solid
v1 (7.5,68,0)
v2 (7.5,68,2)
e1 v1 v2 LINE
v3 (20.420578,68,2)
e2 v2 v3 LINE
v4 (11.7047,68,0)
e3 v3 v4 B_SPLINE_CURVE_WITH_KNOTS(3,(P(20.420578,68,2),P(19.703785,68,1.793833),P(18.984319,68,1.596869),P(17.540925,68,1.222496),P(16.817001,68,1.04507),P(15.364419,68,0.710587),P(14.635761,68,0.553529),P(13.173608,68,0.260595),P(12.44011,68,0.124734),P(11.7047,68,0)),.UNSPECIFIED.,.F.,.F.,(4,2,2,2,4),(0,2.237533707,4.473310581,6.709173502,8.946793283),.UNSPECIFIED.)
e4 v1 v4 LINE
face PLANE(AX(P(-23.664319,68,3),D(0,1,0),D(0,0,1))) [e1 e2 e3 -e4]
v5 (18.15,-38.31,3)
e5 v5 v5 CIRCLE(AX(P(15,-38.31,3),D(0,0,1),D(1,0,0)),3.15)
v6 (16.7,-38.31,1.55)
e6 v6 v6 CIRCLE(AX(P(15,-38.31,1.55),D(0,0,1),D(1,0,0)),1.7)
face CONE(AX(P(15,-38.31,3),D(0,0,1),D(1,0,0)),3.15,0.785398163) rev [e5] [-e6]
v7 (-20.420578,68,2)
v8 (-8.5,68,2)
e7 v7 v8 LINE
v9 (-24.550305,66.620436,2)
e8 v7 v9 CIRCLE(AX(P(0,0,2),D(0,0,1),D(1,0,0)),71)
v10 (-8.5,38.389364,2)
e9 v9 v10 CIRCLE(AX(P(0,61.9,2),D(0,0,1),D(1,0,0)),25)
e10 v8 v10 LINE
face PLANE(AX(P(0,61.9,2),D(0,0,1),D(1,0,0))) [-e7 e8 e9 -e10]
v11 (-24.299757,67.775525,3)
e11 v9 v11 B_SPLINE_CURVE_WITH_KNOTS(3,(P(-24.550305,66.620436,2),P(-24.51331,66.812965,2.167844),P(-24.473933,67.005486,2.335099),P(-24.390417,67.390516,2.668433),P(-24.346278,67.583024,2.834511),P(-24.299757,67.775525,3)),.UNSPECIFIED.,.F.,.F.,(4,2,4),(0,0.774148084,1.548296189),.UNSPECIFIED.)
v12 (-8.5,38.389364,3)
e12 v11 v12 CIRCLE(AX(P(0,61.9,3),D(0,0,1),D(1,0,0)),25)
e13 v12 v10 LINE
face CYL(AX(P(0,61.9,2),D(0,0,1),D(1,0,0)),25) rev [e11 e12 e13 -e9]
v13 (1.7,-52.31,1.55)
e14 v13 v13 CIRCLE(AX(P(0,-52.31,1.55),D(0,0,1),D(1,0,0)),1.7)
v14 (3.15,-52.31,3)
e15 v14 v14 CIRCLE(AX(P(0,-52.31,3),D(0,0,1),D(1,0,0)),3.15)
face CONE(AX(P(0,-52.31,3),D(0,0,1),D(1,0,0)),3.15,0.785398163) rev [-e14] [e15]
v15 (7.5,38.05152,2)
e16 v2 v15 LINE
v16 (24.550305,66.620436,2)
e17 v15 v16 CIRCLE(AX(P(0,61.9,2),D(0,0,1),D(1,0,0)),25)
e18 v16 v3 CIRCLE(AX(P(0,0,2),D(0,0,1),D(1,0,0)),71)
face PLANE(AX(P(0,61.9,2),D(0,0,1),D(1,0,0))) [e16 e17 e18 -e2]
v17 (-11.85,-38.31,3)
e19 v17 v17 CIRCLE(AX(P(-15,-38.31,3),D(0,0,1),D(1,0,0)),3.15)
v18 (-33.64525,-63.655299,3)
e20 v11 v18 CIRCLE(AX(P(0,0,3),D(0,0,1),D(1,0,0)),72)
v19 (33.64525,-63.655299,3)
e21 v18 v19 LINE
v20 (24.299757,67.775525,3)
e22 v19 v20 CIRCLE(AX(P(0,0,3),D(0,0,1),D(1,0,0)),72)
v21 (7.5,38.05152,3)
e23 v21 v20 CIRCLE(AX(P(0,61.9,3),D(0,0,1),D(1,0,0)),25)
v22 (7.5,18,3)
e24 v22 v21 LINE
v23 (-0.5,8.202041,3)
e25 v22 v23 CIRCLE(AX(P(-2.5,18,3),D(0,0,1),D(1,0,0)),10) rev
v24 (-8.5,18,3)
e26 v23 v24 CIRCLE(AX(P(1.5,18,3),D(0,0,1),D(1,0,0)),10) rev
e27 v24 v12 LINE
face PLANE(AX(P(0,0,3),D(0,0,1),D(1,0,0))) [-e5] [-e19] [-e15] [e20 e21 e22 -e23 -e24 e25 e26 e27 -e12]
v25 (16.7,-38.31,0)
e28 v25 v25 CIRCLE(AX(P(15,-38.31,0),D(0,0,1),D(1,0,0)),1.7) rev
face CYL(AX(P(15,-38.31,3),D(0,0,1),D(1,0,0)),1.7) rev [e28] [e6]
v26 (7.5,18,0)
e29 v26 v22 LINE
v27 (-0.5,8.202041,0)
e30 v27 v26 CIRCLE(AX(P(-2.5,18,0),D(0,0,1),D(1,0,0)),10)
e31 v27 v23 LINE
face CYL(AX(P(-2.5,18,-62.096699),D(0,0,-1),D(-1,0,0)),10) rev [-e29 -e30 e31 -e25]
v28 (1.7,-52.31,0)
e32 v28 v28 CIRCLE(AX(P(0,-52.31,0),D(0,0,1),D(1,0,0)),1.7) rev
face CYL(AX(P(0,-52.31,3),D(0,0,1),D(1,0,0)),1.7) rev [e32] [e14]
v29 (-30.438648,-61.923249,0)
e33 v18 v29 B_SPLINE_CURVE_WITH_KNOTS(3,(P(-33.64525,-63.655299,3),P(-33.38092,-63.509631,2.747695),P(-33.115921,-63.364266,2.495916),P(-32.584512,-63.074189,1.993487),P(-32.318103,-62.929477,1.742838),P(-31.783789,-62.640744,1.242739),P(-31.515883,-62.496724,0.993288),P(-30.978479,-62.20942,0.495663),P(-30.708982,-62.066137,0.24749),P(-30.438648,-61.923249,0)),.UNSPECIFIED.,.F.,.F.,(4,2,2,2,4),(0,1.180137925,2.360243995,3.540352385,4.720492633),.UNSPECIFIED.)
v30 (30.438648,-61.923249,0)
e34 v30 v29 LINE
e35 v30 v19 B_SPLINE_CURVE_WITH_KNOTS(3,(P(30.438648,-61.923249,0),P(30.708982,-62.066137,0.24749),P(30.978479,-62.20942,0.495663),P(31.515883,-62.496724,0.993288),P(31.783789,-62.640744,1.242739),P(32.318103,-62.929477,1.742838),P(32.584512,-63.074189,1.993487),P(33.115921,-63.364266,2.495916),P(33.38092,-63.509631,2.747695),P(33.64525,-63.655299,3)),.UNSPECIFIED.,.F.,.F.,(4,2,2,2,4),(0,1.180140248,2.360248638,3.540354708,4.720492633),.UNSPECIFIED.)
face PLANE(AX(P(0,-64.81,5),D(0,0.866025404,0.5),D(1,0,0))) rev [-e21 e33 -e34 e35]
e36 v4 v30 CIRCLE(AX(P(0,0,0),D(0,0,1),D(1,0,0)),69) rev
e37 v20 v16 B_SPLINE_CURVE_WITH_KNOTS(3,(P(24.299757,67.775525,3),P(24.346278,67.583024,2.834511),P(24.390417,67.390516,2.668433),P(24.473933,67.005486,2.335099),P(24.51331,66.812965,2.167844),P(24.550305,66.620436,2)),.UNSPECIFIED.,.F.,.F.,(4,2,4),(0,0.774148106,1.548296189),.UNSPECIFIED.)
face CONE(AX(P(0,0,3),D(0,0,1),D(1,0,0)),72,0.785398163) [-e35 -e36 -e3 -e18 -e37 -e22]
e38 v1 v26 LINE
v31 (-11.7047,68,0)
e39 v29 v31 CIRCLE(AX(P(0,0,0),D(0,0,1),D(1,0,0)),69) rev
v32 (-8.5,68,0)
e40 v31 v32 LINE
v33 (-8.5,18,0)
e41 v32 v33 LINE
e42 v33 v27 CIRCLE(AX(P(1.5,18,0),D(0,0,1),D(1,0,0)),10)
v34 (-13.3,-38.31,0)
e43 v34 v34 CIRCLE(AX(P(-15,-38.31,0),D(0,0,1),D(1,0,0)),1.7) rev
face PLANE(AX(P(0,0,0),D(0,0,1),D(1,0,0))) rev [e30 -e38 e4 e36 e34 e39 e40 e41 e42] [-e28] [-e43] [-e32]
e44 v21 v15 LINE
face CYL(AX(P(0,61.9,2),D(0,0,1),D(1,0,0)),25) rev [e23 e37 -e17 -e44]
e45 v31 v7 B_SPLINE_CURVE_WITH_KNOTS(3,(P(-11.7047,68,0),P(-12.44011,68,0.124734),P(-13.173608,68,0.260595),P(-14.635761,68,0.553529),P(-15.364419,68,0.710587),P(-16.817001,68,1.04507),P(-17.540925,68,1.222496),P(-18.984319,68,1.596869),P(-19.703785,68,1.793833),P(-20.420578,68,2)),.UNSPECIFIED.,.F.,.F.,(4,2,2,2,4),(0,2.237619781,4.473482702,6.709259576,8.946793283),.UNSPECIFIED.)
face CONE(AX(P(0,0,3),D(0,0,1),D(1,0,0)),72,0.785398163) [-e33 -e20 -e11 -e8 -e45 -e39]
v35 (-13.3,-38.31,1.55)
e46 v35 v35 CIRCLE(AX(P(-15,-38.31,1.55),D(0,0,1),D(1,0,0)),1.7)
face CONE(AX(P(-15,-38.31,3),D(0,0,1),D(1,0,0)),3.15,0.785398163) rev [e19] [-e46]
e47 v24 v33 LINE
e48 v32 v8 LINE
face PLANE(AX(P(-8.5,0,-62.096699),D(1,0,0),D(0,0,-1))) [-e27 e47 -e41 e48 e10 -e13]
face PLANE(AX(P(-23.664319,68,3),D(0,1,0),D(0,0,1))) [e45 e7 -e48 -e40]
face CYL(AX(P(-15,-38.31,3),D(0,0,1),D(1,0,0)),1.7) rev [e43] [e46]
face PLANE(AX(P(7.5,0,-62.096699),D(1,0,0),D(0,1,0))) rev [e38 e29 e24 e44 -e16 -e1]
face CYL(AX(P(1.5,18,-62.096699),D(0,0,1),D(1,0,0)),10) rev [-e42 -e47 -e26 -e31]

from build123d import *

# Parameters (mm, degrees)
BOSS_EXTRUDE2_DEPTH                                 = 3
CSK_FOR_M3_COUNTERSUNK_FLAT_HEAD_SCREW1_D           = 3.4
CSK_FOR_M3_COUNTERSUNK_FLAT_HEAD_SCREW1_DEPTH       = 3
CSK_FOR_M3_COUNTERSUNK_FLAT_HEAD_SCREW1_CSINK_D     = 6.3
CSK_FOR_M3_COUNTERSUNK_FLAT_HEAD_SCREW1_CSINK_ANGLE = 90
CSK_FOR_M3_COUNTERSUNK_FLAT_HEAD_SCREW1_TIP         = 1.021463052
SKETCH4_W                                           = 16
SKETCH4_H                                           = 60
CUT_EXTRUDE1_DEPTH                                  = 3
SKETCH5_R                                           = 25
CUT_EXTRUDE2_DEPTH                                  = 1
FILLET1_R                                           = 10
CUT_EXTRUDE3_DEPTH                                  = 21
CHAMFER2_SIZE                                       = 5
CHAMFER2_SIZE_2                                     = 2.886751346


with BuildPart() as part:
    # Sketch1 → Boss-Extrude2 (new body)
    with BuildSketch(Plane.XY):
        with BuildLine():
            Line((-23.664319132, 68), (23.664319132, 68))
            ThreePointArc((23.664319132, 68), (0, -72), (-23.664319132, 68))
        make_face()
    extrude(amount=BOSS_EXTRUDE2_DEPTH)

    # CSK for M3 Countersunk Flat Head Screw1
    with Locations(Plane.XY.offset(3)):
        with Locations((15, -38.31), (-15, -38.31), (0, -52.31)):
            CounterSinkHole(CSK_FOR_M3_COUNTERSUNK_FLAT_HEAD_SCREW1_D / 2, CSK_FOR_M3_COUNTERSUNK_FLAT_HEAD_SCREW1_CSINK_D / 2, depth=CSK_FOR_M3_COUNTERSUNK_FLAT_HEAD_SCREW1_DEPTH, counter_sink_angle=CSK_FOR_M3_COUNTERSUNK_FLAT_HEAD_SCREW1_CSINK_ANGLE)
            with Locations((0, 0, -(CSK_FOR_M3_COUNTERSUNK_FLAT_HEAD_SCREW1_DEPTH + CSK_FOR_M3_COUNTERSUNK_FLAT_HEAD_SCREW1_TIP / 2))):  # 118° drill point
                Cone(0, CSK_FOR_M3_COUNTERSUNK_FLAT_HEAD_SCREW1_D / 2, CSK_FOR_M3_COUNTERSUNK_FLAT_HEAD_SCREW1_TIP, mode=Mode.SUBTRACT)

    # Sketch4 → Cut-Extrude1 (cut)
    with BuildSketch(Plane.XY.offset(3)):
        with Locations((-0.5, 38)):
            Rectangle(SKETCH4_W, SKETCH4_H)
    extrude(amount=-CUT_EXTRUDE1_DEPTH, mode=Mode.SUBTRACT)

    # Sketch5 → Cut-Extrude2 (cut)
    with BuildSketch(Plane.XY.offset(3)):
        with Locations((0, 61.9)):
            Circle(SKETCH5_R)
    extrude(amount=-CUT_EXTRUDE2_DEPTH, mode=Mode.SUBTRACT)

    # Fillet1
    # the kernel refuses this fillet: 10 mm, written as the material it adds along each edge
    with BuildSketch(Plane(origin=(-8.5, 8, 3), x_dir=(1, 0, 0), z_dir=(0, 0, -1)), Plane(origin=(7.5, 8, 3), x_dir=(0, 1, 0), z_dir=(0, 0, -1))) as fillet1_piece_1:
        with BuildLine():
            CenterArc((FILLET1_R, -FILLET1_R), FILLET1_R, 90, 90)
            Line((0, -FILLET1_R), (0, 0))
            Line((0, 0), (FILLET1_R, 0))
        make_face()
    extrude(amount=3)

    # Sketch1<3> → Cut-Extrude3 (cut)
    with BuildSketch(Plane.XY):
        with BuildLine():
            Line((31.363416587, -64.81), (-31.363416587, -64.81))
            ThreePointArc((-31.363416587, -64.81), (0, -72), (31.363416587, -64.81))
        make_face()
    extrude(amount=CUT_EXTRUDE3_DEPTH, mode=Mode.SUBTRACT)

    # Chamfer2
    # the kernel refuses this chamfer: 5, 2.886751346 mm, written as the material it takes off along each edge
    with BuildSketch(Plane(origin=(44.29884536, -64.81, 0), x_dir=(0, -0.019326765612699606, 0.9998132206222079), z_dir=(-1, 0, 0))) as chamfer2_piece_1:
        Polygon((CHAMFER2_SIZE * 0.999813220622, CHAMFER2_SIZE * 0.0193267656127), (-CHAMFER2_SIZE_2 * 0.0193267656124, CHAMFER2_SIZE_2 * 0.999813220604), (0, 0), align=None)
    extrude(amount=88.59769072, mode=Mode.SUBTRACT)

    # Chamfer3
    # the kernel refuses this chamfer: 3 mm, written as the material it takes off along each edge
    with BuildSketch(Plane(origin=(0, 0, 0), x_dir=(0.07743421660335849, 0.9969974634366048, 0), z_dir=(-0.9969974634366048, 0.07743421660335849, 0))) as chamfer3_piece_1:
        with BuildLine():
            Line((72.084852814, -3.084852814), (68.915147186, 0.084852814))
            Line((68.915147186, 0.084852814), (68.915147186, 0.144852814))
            ThreePointArc((68.915147186, 0.144852814), (70.457573593, 0.06), (72, 0.06))
            Line((72, 0.06), (72.06, 0))
            ThreePointArc((72.06, 0), (72.06, -1.542426407), (72.144852814, -3.084852814))
            Line((72.144852814, -3.084852814), (72.084852814, -3.084852814))
        make_face()
    revolve(axis=Axis((0, 0, 0), (0, 0, -1)), revolution_arc=159.627586722, mode=Mode.SUBTRACT)
    with BuildSketch(Plane(origin=(0, 0, 0), x_dir=(-0.27448479603236836, -0.9615914396182347, 0), z_dir=(0.9615914396182347, -0.27448479603236836, 0))) as chamfer3_piece_2:
        with BuildLine():
            Line((72.084852814, -3.084852814), (68.915147186, 0.084852814))
            Line((68.915147186, 0.084852814), (68.915147186, 0.144852814))
            ThreePointArc((68.915147186, 0.144852814), (70.457573593, 0.06), (72, 0.06))
            Line((72, 0.06), (72.06, 0))
            ThreePointArc((72.06, 0), (72.06, -1.542426407), (72.144852814, -3.084852814))
            Line((72.144852814, -3.084852814), (72.084852814, -3.084852814))
        make_face()
    revolve(axis=Axis((0, 0, 0), (0, 0, -1)), revolution_arc=159.627586722, mode=Mode.SUBTRACT)


solid = part.part
